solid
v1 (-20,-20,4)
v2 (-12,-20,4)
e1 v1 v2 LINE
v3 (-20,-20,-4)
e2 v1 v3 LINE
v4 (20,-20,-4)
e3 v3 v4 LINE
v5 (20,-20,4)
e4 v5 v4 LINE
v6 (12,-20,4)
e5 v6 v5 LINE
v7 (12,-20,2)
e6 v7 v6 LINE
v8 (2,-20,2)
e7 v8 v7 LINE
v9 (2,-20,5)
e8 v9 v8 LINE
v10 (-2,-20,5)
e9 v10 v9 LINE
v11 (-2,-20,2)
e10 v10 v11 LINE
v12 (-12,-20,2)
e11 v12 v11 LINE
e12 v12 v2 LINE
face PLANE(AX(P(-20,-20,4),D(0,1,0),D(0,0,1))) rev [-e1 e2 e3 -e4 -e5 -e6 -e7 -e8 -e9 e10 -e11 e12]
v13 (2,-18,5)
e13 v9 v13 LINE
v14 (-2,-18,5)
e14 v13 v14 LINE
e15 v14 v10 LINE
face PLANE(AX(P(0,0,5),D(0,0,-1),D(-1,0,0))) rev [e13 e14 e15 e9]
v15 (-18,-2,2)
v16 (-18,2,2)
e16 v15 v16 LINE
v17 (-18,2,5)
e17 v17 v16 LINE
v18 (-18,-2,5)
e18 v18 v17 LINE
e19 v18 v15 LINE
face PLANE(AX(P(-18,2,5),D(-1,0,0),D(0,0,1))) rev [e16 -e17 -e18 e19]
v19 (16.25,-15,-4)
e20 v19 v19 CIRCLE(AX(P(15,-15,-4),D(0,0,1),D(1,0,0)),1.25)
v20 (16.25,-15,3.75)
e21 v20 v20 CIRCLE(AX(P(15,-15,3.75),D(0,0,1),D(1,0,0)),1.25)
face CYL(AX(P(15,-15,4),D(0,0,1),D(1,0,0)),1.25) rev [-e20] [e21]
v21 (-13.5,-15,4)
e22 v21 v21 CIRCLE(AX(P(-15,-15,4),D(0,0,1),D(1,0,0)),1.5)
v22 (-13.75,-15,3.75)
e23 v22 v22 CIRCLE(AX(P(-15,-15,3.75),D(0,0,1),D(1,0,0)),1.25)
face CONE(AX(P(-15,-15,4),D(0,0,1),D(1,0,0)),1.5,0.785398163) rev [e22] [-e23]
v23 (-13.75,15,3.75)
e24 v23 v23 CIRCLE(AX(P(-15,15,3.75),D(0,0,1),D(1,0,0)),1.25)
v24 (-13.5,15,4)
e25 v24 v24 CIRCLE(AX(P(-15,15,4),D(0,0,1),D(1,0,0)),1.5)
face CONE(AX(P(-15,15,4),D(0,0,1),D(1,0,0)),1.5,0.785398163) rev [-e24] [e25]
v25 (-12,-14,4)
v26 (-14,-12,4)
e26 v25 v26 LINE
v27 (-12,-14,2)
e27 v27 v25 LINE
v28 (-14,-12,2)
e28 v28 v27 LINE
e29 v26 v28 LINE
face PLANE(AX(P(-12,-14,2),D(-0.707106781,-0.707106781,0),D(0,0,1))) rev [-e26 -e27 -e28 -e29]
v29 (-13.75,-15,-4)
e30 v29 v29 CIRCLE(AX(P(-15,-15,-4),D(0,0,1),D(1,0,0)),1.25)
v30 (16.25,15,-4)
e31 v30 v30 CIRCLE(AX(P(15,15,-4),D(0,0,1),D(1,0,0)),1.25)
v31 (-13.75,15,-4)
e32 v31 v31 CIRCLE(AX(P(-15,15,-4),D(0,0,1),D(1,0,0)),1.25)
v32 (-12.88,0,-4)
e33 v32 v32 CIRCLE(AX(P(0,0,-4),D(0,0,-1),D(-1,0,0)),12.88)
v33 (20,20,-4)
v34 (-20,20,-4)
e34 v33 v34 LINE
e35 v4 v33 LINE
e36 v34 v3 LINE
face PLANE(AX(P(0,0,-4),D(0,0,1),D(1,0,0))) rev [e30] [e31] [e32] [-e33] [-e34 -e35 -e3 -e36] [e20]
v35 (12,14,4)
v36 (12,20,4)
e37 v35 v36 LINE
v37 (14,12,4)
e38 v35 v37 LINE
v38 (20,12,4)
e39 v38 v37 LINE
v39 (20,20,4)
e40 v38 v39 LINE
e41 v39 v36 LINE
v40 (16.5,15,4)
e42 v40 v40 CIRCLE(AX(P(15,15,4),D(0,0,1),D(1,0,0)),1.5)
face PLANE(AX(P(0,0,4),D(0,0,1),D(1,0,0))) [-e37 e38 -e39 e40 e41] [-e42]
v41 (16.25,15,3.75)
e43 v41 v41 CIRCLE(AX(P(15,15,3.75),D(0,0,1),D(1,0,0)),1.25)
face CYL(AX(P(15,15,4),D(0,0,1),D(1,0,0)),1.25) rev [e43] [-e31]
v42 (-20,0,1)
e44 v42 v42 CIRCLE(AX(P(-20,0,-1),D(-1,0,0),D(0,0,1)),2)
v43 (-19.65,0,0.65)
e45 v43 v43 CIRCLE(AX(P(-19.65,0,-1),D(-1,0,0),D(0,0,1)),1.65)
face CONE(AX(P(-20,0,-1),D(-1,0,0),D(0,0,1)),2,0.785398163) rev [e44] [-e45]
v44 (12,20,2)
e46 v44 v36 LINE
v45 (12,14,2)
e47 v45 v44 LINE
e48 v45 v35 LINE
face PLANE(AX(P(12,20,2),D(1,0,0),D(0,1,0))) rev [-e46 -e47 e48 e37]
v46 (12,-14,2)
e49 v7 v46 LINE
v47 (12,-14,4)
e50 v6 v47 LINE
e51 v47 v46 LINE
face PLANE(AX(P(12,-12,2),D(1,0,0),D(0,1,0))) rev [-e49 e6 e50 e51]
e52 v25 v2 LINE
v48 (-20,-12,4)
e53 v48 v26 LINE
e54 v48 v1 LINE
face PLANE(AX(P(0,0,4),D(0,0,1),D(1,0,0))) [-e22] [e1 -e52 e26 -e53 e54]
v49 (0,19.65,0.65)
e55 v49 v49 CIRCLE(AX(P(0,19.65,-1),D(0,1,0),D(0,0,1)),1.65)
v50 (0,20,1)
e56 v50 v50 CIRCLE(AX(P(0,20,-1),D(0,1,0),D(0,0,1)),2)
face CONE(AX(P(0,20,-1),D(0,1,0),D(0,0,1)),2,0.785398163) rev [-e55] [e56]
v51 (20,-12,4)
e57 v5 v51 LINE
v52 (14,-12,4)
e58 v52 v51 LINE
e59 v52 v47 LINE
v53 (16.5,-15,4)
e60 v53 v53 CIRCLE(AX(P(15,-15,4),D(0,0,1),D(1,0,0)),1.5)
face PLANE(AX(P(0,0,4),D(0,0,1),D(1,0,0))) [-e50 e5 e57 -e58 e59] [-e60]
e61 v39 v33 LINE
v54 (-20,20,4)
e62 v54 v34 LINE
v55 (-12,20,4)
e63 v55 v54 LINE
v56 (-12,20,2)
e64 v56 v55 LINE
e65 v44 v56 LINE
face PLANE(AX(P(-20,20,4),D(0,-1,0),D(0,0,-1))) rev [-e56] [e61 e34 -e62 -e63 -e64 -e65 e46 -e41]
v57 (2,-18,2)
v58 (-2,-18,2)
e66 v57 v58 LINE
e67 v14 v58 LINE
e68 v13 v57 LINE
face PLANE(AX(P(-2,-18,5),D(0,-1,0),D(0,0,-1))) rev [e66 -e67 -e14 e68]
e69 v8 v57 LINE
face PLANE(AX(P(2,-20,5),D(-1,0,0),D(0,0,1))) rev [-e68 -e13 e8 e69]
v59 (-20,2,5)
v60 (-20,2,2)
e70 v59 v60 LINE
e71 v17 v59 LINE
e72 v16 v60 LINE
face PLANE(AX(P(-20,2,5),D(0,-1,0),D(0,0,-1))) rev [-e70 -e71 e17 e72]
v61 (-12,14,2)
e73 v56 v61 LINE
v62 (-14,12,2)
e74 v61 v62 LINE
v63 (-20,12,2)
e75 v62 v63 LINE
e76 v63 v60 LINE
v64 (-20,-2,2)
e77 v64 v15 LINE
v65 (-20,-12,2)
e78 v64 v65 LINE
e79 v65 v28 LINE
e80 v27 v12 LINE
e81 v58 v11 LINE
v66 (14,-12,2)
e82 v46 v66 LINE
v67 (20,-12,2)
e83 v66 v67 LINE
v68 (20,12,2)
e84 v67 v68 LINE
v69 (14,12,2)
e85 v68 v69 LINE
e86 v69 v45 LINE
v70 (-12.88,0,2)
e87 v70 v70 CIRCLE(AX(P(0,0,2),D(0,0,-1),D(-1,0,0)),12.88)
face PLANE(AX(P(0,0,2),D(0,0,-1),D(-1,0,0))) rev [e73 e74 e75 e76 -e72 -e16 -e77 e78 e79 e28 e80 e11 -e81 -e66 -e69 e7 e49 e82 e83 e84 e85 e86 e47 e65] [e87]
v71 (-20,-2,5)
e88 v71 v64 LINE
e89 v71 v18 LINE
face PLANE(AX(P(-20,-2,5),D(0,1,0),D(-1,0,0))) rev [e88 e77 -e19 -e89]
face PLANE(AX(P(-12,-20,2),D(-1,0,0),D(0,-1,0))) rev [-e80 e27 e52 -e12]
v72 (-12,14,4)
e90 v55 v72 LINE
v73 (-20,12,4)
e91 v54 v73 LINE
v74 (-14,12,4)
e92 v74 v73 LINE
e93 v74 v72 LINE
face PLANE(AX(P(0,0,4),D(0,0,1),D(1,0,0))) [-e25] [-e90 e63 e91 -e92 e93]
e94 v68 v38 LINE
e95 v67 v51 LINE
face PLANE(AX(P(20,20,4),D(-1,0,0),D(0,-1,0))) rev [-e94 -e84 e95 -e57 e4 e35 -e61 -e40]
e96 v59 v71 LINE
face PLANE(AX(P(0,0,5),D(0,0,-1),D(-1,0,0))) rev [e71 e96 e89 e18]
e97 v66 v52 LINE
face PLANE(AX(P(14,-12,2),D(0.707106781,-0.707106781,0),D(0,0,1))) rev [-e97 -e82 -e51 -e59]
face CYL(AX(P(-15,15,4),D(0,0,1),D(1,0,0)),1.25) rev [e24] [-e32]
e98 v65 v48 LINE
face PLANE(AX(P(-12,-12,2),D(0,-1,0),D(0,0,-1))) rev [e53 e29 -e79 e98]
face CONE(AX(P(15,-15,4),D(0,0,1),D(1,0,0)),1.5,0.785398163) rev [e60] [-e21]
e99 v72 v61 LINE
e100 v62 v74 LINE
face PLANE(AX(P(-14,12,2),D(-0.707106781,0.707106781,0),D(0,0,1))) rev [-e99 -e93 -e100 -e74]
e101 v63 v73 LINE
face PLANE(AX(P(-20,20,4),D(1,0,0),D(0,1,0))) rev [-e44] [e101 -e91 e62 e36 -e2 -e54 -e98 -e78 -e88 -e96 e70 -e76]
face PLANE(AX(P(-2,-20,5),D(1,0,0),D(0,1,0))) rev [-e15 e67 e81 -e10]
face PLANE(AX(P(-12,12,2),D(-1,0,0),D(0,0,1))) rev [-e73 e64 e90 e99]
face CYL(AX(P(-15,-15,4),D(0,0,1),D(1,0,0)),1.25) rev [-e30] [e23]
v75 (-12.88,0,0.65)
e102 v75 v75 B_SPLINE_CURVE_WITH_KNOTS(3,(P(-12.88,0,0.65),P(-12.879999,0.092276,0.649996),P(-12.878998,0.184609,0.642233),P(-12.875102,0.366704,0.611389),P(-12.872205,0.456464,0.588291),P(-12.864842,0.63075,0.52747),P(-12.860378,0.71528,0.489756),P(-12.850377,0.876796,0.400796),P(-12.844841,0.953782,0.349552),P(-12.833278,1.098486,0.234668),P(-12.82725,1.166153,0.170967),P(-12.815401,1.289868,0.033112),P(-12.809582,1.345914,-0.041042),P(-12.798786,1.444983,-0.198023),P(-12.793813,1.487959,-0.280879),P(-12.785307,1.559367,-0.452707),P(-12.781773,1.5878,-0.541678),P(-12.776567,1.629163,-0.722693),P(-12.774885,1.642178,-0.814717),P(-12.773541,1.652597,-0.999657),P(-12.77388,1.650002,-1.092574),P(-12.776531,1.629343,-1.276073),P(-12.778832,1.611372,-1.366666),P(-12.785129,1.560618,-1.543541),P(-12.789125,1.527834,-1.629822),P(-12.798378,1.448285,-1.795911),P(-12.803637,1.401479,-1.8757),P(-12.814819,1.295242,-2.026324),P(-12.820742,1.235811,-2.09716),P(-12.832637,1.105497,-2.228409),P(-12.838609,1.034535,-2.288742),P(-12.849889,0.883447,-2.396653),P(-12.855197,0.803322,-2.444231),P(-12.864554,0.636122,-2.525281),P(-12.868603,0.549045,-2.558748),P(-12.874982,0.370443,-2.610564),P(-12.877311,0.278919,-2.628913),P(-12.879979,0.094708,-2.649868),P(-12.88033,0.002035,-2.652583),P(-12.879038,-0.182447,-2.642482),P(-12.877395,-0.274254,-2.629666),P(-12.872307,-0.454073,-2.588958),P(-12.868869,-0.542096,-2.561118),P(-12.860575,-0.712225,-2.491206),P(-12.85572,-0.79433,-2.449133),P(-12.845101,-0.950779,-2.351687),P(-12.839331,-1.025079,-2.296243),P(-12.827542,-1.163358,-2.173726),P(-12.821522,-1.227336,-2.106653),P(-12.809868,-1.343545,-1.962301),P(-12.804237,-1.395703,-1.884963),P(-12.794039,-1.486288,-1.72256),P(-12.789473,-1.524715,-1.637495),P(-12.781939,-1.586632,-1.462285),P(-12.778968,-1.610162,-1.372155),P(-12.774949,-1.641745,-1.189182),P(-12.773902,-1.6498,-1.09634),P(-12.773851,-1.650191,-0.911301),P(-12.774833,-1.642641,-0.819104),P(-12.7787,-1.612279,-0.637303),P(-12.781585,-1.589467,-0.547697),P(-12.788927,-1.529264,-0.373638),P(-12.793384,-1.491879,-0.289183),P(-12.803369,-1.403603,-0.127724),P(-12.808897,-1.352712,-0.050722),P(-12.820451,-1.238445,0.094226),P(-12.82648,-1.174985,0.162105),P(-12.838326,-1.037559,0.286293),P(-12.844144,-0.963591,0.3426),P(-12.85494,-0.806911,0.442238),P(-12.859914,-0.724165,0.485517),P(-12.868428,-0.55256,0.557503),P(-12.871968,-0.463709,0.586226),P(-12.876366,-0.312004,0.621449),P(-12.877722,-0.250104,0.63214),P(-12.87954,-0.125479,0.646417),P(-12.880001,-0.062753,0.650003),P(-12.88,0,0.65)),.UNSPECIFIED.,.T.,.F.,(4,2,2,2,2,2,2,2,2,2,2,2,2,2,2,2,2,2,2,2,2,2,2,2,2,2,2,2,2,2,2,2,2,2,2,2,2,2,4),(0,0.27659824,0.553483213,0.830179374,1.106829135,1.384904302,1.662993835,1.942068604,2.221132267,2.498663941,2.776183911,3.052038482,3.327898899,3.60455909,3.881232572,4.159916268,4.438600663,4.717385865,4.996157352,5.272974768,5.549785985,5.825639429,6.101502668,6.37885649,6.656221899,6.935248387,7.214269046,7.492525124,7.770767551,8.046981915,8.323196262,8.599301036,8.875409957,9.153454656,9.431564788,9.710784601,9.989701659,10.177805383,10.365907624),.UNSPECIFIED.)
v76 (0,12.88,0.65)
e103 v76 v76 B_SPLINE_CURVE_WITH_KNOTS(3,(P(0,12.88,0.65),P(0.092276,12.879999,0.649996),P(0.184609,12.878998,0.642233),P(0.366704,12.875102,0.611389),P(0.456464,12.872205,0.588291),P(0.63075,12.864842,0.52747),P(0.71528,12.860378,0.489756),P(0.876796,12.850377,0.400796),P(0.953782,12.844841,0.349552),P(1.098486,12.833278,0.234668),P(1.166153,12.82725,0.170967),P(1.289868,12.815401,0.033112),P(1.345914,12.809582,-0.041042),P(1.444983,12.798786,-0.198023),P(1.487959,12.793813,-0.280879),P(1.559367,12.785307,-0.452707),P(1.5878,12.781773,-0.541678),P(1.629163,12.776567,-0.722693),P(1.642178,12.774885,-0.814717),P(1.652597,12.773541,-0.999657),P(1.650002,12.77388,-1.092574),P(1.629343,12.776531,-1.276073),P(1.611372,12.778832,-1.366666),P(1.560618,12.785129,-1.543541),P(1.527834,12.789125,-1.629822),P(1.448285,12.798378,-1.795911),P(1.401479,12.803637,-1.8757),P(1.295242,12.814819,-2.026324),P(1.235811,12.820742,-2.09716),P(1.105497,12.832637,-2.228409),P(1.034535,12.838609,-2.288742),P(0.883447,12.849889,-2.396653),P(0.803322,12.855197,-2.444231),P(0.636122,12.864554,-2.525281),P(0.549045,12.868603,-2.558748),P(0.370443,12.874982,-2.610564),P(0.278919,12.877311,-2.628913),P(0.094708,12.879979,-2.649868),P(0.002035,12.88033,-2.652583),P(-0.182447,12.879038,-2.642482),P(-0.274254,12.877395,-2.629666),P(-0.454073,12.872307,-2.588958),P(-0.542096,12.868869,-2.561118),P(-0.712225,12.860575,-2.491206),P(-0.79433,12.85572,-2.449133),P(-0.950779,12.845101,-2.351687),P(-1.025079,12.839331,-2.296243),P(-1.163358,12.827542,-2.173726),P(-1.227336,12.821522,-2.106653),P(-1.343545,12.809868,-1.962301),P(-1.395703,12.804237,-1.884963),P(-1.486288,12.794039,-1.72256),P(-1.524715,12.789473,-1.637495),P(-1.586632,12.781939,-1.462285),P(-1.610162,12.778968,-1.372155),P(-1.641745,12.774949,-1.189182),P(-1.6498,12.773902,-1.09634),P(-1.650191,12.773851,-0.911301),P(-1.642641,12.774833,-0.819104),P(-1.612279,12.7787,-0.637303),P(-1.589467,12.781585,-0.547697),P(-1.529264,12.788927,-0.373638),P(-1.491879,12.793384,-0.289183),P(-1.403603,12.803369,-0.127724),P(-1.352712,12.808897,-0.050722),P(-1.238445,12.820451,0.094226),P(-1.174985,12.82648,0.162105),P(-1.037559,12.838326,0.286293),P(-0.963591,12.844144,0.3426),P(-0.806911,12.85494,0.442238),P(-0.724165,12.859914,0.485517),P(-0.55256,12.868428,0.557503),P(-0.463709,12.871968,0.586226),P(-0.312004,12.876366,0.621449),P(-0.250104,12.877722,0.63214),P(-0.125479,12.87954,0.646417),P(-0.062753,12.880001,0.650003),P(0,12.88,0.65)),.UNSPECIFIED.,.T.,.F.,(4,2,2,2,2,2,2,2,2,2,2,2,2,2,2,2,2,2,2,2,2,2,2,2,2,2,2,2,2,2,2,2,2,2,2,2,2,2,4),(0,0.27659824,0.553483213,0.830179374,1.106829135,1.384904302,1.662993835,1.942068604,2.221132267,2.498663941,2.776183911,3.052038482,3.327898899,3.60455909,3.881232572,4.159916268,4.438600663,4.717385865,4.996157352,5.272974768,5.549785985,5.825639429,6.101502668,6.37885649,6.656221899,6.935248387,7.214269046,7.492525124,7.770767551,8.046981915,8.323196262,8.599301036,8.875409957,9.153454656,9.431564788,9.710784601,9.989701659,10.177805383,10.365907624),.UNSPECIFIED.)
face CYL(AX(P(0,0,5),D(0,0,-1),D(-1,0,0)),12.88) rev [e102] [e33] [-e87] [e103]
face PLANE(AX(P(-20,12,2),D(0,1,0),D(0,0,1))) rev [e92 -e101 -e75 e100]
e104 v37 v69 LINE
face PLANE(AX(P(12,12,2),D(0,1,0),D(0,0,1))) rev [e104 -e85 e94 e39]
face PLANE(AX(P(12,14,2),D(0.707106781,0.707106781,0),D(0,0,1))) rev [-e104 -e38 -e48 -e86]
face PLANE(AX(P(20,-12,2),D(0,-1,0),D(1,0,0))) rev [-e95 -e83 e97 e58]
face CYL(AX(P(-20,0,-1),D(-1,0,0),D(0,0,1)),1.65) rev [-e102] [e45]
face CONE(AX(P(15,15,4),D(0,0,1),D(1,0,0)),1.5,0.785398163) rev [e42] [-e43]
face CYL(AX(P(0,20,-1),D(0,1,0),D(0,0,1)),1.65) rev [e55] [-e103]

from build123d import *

# Parameters (mm, degrees)
SKETCH1_W                       = 40
SKETCH1_H                       = 40
BOSS_EXTRUDE1_DEPTH             = 4
M3X0_5_TAPPED_HOLE1_D           = 2.5
M3X0_5_TAPPED_HOLE1_CSINK_D     = 3
M3X0_5_TAPPED_HOLE1_CSINK_ANGLE = 90
CUT_EXTRUDE1_DEPTH              = 2
CHAMFER1_SIZE                   = 2
SKETCH7_W                       = 2
SKETCH7_H                       = 4
SKETCH7_W_2                     = 4
SKETCH7_H_2                     = 2
BOSS_EXTRUDE2_DEPTH             = 3
SKETCH12_R                      = 12.88
CUT_EXTRUDE2_DEPTH              = 30.681644159


# Read off the part's stored shape, not the designer's step: M4x0.7 Tapped Hole1, M4x0.7 Tapped Hole2
with BuildPart() as part:
    # Sketch1 → Boss-Extrude1 (new, symmetric)
    with BuildSketch(Plane.XY):
        Rectangle(SKETCH1_W, SKETCH1_H)
    extrude(amount=BOSS_EXTRUDE1_DEPTH, both=True)

    # M3x0.5 Tapped Hole1 (through all)
    with Locations(Plane.XY.offset(4)):
        with Locations((-15, 15), (15, 15), (15, -15), (-15, -15)):
            CounterSinkHole(M3X0_5_TAPPED_HOLE1_D / 2, M3X0_5_TAPPED_HOLE1_CSINK_D / 2, counter_sink_angle=M3X0_5_TAPPED_HOLE1_CSINK_ANGLE)

    # Sketch6 → Cut-Extrude1 (cut)
    with BuildSketch(Plane.XY.offset(4)):
        Polygon((-20, 12), (-12, 12), (-12, 20), (12, 20), (12, 12), (20, 12), (20, -12), (12, -12), (12, -20), (-12, -20), (-12, -12), (-20, -12), align=None)
    extrude(amount=-CUT_EXTRUDE1_DEPTH, mode=Mode.SUBTRACT)

    # Chamfer1
    chamfer1_edges = [part.edges().sort_by_distance(p)[0] for p in [
        (-12, 12, 3),
        (12, 12, 3),
        (12, -12, 3),
        (-12, -12, 3),
    ]]
    chamfer(chamfer1_edges, length=CHAMFER1_SIZE)

    # Sketch7 → Boss-Extrude2 (add)
    with BuildSketch(Plane.XY.offset(2)):
        with Locations((-19, 0)):
            Rectangle(SKETCH7_W, SKETCH7_H)
        with Locations((0, -19)):
            Rectangle(SKETCH7_W_2, SKETCH7_H_2)
    extrude(amount=BOSS_EXTRUDE2_DEPTH)

    # Sketch12 → Cut-Extrude2 (cut, through all)
    with BuildSketch(Plane(origin=(0, 0, -4), x_dir=(-1, 0, 0), z_dir=(0, 0, -1))):
        Circle(SKETCH12_R)
    extrude(amount=-CUT_EXTRUDE2_DEPTH, mode=Mode.SUBTRACT)

    # M4x0.7 Tapped Hole1 outline → M4x0.7 Tapped Hole1 (revolve, cut)
    with BuildSketch(Plane.XY.offset(-1)):
        Polygon((0, 12.773860334), (1.65, 12.773860334), (1.65, 19.65), (2, 20), (0, 20), align=None)
    revolve(axis=Axis((0, 0, -1), (0, 1, 0)), mode=Mode.SUBTRACT)

    # M4x0.7 Tapped Hole2 outline → M4x0.7 Tapped Hole2 (revolve, cut)
    with BuildSketch(Plane.YX.offset(1)):
        Polygon((1.65, -19.65), (1.65, -12.773829877), (0, -12.773829877), (0, -20), (2, -20), align=None)
    revolve(axis=Axis((0, 0, -1), (1, 0, 0)), mode=Mode.SUBTRACT)


solid = part.part
